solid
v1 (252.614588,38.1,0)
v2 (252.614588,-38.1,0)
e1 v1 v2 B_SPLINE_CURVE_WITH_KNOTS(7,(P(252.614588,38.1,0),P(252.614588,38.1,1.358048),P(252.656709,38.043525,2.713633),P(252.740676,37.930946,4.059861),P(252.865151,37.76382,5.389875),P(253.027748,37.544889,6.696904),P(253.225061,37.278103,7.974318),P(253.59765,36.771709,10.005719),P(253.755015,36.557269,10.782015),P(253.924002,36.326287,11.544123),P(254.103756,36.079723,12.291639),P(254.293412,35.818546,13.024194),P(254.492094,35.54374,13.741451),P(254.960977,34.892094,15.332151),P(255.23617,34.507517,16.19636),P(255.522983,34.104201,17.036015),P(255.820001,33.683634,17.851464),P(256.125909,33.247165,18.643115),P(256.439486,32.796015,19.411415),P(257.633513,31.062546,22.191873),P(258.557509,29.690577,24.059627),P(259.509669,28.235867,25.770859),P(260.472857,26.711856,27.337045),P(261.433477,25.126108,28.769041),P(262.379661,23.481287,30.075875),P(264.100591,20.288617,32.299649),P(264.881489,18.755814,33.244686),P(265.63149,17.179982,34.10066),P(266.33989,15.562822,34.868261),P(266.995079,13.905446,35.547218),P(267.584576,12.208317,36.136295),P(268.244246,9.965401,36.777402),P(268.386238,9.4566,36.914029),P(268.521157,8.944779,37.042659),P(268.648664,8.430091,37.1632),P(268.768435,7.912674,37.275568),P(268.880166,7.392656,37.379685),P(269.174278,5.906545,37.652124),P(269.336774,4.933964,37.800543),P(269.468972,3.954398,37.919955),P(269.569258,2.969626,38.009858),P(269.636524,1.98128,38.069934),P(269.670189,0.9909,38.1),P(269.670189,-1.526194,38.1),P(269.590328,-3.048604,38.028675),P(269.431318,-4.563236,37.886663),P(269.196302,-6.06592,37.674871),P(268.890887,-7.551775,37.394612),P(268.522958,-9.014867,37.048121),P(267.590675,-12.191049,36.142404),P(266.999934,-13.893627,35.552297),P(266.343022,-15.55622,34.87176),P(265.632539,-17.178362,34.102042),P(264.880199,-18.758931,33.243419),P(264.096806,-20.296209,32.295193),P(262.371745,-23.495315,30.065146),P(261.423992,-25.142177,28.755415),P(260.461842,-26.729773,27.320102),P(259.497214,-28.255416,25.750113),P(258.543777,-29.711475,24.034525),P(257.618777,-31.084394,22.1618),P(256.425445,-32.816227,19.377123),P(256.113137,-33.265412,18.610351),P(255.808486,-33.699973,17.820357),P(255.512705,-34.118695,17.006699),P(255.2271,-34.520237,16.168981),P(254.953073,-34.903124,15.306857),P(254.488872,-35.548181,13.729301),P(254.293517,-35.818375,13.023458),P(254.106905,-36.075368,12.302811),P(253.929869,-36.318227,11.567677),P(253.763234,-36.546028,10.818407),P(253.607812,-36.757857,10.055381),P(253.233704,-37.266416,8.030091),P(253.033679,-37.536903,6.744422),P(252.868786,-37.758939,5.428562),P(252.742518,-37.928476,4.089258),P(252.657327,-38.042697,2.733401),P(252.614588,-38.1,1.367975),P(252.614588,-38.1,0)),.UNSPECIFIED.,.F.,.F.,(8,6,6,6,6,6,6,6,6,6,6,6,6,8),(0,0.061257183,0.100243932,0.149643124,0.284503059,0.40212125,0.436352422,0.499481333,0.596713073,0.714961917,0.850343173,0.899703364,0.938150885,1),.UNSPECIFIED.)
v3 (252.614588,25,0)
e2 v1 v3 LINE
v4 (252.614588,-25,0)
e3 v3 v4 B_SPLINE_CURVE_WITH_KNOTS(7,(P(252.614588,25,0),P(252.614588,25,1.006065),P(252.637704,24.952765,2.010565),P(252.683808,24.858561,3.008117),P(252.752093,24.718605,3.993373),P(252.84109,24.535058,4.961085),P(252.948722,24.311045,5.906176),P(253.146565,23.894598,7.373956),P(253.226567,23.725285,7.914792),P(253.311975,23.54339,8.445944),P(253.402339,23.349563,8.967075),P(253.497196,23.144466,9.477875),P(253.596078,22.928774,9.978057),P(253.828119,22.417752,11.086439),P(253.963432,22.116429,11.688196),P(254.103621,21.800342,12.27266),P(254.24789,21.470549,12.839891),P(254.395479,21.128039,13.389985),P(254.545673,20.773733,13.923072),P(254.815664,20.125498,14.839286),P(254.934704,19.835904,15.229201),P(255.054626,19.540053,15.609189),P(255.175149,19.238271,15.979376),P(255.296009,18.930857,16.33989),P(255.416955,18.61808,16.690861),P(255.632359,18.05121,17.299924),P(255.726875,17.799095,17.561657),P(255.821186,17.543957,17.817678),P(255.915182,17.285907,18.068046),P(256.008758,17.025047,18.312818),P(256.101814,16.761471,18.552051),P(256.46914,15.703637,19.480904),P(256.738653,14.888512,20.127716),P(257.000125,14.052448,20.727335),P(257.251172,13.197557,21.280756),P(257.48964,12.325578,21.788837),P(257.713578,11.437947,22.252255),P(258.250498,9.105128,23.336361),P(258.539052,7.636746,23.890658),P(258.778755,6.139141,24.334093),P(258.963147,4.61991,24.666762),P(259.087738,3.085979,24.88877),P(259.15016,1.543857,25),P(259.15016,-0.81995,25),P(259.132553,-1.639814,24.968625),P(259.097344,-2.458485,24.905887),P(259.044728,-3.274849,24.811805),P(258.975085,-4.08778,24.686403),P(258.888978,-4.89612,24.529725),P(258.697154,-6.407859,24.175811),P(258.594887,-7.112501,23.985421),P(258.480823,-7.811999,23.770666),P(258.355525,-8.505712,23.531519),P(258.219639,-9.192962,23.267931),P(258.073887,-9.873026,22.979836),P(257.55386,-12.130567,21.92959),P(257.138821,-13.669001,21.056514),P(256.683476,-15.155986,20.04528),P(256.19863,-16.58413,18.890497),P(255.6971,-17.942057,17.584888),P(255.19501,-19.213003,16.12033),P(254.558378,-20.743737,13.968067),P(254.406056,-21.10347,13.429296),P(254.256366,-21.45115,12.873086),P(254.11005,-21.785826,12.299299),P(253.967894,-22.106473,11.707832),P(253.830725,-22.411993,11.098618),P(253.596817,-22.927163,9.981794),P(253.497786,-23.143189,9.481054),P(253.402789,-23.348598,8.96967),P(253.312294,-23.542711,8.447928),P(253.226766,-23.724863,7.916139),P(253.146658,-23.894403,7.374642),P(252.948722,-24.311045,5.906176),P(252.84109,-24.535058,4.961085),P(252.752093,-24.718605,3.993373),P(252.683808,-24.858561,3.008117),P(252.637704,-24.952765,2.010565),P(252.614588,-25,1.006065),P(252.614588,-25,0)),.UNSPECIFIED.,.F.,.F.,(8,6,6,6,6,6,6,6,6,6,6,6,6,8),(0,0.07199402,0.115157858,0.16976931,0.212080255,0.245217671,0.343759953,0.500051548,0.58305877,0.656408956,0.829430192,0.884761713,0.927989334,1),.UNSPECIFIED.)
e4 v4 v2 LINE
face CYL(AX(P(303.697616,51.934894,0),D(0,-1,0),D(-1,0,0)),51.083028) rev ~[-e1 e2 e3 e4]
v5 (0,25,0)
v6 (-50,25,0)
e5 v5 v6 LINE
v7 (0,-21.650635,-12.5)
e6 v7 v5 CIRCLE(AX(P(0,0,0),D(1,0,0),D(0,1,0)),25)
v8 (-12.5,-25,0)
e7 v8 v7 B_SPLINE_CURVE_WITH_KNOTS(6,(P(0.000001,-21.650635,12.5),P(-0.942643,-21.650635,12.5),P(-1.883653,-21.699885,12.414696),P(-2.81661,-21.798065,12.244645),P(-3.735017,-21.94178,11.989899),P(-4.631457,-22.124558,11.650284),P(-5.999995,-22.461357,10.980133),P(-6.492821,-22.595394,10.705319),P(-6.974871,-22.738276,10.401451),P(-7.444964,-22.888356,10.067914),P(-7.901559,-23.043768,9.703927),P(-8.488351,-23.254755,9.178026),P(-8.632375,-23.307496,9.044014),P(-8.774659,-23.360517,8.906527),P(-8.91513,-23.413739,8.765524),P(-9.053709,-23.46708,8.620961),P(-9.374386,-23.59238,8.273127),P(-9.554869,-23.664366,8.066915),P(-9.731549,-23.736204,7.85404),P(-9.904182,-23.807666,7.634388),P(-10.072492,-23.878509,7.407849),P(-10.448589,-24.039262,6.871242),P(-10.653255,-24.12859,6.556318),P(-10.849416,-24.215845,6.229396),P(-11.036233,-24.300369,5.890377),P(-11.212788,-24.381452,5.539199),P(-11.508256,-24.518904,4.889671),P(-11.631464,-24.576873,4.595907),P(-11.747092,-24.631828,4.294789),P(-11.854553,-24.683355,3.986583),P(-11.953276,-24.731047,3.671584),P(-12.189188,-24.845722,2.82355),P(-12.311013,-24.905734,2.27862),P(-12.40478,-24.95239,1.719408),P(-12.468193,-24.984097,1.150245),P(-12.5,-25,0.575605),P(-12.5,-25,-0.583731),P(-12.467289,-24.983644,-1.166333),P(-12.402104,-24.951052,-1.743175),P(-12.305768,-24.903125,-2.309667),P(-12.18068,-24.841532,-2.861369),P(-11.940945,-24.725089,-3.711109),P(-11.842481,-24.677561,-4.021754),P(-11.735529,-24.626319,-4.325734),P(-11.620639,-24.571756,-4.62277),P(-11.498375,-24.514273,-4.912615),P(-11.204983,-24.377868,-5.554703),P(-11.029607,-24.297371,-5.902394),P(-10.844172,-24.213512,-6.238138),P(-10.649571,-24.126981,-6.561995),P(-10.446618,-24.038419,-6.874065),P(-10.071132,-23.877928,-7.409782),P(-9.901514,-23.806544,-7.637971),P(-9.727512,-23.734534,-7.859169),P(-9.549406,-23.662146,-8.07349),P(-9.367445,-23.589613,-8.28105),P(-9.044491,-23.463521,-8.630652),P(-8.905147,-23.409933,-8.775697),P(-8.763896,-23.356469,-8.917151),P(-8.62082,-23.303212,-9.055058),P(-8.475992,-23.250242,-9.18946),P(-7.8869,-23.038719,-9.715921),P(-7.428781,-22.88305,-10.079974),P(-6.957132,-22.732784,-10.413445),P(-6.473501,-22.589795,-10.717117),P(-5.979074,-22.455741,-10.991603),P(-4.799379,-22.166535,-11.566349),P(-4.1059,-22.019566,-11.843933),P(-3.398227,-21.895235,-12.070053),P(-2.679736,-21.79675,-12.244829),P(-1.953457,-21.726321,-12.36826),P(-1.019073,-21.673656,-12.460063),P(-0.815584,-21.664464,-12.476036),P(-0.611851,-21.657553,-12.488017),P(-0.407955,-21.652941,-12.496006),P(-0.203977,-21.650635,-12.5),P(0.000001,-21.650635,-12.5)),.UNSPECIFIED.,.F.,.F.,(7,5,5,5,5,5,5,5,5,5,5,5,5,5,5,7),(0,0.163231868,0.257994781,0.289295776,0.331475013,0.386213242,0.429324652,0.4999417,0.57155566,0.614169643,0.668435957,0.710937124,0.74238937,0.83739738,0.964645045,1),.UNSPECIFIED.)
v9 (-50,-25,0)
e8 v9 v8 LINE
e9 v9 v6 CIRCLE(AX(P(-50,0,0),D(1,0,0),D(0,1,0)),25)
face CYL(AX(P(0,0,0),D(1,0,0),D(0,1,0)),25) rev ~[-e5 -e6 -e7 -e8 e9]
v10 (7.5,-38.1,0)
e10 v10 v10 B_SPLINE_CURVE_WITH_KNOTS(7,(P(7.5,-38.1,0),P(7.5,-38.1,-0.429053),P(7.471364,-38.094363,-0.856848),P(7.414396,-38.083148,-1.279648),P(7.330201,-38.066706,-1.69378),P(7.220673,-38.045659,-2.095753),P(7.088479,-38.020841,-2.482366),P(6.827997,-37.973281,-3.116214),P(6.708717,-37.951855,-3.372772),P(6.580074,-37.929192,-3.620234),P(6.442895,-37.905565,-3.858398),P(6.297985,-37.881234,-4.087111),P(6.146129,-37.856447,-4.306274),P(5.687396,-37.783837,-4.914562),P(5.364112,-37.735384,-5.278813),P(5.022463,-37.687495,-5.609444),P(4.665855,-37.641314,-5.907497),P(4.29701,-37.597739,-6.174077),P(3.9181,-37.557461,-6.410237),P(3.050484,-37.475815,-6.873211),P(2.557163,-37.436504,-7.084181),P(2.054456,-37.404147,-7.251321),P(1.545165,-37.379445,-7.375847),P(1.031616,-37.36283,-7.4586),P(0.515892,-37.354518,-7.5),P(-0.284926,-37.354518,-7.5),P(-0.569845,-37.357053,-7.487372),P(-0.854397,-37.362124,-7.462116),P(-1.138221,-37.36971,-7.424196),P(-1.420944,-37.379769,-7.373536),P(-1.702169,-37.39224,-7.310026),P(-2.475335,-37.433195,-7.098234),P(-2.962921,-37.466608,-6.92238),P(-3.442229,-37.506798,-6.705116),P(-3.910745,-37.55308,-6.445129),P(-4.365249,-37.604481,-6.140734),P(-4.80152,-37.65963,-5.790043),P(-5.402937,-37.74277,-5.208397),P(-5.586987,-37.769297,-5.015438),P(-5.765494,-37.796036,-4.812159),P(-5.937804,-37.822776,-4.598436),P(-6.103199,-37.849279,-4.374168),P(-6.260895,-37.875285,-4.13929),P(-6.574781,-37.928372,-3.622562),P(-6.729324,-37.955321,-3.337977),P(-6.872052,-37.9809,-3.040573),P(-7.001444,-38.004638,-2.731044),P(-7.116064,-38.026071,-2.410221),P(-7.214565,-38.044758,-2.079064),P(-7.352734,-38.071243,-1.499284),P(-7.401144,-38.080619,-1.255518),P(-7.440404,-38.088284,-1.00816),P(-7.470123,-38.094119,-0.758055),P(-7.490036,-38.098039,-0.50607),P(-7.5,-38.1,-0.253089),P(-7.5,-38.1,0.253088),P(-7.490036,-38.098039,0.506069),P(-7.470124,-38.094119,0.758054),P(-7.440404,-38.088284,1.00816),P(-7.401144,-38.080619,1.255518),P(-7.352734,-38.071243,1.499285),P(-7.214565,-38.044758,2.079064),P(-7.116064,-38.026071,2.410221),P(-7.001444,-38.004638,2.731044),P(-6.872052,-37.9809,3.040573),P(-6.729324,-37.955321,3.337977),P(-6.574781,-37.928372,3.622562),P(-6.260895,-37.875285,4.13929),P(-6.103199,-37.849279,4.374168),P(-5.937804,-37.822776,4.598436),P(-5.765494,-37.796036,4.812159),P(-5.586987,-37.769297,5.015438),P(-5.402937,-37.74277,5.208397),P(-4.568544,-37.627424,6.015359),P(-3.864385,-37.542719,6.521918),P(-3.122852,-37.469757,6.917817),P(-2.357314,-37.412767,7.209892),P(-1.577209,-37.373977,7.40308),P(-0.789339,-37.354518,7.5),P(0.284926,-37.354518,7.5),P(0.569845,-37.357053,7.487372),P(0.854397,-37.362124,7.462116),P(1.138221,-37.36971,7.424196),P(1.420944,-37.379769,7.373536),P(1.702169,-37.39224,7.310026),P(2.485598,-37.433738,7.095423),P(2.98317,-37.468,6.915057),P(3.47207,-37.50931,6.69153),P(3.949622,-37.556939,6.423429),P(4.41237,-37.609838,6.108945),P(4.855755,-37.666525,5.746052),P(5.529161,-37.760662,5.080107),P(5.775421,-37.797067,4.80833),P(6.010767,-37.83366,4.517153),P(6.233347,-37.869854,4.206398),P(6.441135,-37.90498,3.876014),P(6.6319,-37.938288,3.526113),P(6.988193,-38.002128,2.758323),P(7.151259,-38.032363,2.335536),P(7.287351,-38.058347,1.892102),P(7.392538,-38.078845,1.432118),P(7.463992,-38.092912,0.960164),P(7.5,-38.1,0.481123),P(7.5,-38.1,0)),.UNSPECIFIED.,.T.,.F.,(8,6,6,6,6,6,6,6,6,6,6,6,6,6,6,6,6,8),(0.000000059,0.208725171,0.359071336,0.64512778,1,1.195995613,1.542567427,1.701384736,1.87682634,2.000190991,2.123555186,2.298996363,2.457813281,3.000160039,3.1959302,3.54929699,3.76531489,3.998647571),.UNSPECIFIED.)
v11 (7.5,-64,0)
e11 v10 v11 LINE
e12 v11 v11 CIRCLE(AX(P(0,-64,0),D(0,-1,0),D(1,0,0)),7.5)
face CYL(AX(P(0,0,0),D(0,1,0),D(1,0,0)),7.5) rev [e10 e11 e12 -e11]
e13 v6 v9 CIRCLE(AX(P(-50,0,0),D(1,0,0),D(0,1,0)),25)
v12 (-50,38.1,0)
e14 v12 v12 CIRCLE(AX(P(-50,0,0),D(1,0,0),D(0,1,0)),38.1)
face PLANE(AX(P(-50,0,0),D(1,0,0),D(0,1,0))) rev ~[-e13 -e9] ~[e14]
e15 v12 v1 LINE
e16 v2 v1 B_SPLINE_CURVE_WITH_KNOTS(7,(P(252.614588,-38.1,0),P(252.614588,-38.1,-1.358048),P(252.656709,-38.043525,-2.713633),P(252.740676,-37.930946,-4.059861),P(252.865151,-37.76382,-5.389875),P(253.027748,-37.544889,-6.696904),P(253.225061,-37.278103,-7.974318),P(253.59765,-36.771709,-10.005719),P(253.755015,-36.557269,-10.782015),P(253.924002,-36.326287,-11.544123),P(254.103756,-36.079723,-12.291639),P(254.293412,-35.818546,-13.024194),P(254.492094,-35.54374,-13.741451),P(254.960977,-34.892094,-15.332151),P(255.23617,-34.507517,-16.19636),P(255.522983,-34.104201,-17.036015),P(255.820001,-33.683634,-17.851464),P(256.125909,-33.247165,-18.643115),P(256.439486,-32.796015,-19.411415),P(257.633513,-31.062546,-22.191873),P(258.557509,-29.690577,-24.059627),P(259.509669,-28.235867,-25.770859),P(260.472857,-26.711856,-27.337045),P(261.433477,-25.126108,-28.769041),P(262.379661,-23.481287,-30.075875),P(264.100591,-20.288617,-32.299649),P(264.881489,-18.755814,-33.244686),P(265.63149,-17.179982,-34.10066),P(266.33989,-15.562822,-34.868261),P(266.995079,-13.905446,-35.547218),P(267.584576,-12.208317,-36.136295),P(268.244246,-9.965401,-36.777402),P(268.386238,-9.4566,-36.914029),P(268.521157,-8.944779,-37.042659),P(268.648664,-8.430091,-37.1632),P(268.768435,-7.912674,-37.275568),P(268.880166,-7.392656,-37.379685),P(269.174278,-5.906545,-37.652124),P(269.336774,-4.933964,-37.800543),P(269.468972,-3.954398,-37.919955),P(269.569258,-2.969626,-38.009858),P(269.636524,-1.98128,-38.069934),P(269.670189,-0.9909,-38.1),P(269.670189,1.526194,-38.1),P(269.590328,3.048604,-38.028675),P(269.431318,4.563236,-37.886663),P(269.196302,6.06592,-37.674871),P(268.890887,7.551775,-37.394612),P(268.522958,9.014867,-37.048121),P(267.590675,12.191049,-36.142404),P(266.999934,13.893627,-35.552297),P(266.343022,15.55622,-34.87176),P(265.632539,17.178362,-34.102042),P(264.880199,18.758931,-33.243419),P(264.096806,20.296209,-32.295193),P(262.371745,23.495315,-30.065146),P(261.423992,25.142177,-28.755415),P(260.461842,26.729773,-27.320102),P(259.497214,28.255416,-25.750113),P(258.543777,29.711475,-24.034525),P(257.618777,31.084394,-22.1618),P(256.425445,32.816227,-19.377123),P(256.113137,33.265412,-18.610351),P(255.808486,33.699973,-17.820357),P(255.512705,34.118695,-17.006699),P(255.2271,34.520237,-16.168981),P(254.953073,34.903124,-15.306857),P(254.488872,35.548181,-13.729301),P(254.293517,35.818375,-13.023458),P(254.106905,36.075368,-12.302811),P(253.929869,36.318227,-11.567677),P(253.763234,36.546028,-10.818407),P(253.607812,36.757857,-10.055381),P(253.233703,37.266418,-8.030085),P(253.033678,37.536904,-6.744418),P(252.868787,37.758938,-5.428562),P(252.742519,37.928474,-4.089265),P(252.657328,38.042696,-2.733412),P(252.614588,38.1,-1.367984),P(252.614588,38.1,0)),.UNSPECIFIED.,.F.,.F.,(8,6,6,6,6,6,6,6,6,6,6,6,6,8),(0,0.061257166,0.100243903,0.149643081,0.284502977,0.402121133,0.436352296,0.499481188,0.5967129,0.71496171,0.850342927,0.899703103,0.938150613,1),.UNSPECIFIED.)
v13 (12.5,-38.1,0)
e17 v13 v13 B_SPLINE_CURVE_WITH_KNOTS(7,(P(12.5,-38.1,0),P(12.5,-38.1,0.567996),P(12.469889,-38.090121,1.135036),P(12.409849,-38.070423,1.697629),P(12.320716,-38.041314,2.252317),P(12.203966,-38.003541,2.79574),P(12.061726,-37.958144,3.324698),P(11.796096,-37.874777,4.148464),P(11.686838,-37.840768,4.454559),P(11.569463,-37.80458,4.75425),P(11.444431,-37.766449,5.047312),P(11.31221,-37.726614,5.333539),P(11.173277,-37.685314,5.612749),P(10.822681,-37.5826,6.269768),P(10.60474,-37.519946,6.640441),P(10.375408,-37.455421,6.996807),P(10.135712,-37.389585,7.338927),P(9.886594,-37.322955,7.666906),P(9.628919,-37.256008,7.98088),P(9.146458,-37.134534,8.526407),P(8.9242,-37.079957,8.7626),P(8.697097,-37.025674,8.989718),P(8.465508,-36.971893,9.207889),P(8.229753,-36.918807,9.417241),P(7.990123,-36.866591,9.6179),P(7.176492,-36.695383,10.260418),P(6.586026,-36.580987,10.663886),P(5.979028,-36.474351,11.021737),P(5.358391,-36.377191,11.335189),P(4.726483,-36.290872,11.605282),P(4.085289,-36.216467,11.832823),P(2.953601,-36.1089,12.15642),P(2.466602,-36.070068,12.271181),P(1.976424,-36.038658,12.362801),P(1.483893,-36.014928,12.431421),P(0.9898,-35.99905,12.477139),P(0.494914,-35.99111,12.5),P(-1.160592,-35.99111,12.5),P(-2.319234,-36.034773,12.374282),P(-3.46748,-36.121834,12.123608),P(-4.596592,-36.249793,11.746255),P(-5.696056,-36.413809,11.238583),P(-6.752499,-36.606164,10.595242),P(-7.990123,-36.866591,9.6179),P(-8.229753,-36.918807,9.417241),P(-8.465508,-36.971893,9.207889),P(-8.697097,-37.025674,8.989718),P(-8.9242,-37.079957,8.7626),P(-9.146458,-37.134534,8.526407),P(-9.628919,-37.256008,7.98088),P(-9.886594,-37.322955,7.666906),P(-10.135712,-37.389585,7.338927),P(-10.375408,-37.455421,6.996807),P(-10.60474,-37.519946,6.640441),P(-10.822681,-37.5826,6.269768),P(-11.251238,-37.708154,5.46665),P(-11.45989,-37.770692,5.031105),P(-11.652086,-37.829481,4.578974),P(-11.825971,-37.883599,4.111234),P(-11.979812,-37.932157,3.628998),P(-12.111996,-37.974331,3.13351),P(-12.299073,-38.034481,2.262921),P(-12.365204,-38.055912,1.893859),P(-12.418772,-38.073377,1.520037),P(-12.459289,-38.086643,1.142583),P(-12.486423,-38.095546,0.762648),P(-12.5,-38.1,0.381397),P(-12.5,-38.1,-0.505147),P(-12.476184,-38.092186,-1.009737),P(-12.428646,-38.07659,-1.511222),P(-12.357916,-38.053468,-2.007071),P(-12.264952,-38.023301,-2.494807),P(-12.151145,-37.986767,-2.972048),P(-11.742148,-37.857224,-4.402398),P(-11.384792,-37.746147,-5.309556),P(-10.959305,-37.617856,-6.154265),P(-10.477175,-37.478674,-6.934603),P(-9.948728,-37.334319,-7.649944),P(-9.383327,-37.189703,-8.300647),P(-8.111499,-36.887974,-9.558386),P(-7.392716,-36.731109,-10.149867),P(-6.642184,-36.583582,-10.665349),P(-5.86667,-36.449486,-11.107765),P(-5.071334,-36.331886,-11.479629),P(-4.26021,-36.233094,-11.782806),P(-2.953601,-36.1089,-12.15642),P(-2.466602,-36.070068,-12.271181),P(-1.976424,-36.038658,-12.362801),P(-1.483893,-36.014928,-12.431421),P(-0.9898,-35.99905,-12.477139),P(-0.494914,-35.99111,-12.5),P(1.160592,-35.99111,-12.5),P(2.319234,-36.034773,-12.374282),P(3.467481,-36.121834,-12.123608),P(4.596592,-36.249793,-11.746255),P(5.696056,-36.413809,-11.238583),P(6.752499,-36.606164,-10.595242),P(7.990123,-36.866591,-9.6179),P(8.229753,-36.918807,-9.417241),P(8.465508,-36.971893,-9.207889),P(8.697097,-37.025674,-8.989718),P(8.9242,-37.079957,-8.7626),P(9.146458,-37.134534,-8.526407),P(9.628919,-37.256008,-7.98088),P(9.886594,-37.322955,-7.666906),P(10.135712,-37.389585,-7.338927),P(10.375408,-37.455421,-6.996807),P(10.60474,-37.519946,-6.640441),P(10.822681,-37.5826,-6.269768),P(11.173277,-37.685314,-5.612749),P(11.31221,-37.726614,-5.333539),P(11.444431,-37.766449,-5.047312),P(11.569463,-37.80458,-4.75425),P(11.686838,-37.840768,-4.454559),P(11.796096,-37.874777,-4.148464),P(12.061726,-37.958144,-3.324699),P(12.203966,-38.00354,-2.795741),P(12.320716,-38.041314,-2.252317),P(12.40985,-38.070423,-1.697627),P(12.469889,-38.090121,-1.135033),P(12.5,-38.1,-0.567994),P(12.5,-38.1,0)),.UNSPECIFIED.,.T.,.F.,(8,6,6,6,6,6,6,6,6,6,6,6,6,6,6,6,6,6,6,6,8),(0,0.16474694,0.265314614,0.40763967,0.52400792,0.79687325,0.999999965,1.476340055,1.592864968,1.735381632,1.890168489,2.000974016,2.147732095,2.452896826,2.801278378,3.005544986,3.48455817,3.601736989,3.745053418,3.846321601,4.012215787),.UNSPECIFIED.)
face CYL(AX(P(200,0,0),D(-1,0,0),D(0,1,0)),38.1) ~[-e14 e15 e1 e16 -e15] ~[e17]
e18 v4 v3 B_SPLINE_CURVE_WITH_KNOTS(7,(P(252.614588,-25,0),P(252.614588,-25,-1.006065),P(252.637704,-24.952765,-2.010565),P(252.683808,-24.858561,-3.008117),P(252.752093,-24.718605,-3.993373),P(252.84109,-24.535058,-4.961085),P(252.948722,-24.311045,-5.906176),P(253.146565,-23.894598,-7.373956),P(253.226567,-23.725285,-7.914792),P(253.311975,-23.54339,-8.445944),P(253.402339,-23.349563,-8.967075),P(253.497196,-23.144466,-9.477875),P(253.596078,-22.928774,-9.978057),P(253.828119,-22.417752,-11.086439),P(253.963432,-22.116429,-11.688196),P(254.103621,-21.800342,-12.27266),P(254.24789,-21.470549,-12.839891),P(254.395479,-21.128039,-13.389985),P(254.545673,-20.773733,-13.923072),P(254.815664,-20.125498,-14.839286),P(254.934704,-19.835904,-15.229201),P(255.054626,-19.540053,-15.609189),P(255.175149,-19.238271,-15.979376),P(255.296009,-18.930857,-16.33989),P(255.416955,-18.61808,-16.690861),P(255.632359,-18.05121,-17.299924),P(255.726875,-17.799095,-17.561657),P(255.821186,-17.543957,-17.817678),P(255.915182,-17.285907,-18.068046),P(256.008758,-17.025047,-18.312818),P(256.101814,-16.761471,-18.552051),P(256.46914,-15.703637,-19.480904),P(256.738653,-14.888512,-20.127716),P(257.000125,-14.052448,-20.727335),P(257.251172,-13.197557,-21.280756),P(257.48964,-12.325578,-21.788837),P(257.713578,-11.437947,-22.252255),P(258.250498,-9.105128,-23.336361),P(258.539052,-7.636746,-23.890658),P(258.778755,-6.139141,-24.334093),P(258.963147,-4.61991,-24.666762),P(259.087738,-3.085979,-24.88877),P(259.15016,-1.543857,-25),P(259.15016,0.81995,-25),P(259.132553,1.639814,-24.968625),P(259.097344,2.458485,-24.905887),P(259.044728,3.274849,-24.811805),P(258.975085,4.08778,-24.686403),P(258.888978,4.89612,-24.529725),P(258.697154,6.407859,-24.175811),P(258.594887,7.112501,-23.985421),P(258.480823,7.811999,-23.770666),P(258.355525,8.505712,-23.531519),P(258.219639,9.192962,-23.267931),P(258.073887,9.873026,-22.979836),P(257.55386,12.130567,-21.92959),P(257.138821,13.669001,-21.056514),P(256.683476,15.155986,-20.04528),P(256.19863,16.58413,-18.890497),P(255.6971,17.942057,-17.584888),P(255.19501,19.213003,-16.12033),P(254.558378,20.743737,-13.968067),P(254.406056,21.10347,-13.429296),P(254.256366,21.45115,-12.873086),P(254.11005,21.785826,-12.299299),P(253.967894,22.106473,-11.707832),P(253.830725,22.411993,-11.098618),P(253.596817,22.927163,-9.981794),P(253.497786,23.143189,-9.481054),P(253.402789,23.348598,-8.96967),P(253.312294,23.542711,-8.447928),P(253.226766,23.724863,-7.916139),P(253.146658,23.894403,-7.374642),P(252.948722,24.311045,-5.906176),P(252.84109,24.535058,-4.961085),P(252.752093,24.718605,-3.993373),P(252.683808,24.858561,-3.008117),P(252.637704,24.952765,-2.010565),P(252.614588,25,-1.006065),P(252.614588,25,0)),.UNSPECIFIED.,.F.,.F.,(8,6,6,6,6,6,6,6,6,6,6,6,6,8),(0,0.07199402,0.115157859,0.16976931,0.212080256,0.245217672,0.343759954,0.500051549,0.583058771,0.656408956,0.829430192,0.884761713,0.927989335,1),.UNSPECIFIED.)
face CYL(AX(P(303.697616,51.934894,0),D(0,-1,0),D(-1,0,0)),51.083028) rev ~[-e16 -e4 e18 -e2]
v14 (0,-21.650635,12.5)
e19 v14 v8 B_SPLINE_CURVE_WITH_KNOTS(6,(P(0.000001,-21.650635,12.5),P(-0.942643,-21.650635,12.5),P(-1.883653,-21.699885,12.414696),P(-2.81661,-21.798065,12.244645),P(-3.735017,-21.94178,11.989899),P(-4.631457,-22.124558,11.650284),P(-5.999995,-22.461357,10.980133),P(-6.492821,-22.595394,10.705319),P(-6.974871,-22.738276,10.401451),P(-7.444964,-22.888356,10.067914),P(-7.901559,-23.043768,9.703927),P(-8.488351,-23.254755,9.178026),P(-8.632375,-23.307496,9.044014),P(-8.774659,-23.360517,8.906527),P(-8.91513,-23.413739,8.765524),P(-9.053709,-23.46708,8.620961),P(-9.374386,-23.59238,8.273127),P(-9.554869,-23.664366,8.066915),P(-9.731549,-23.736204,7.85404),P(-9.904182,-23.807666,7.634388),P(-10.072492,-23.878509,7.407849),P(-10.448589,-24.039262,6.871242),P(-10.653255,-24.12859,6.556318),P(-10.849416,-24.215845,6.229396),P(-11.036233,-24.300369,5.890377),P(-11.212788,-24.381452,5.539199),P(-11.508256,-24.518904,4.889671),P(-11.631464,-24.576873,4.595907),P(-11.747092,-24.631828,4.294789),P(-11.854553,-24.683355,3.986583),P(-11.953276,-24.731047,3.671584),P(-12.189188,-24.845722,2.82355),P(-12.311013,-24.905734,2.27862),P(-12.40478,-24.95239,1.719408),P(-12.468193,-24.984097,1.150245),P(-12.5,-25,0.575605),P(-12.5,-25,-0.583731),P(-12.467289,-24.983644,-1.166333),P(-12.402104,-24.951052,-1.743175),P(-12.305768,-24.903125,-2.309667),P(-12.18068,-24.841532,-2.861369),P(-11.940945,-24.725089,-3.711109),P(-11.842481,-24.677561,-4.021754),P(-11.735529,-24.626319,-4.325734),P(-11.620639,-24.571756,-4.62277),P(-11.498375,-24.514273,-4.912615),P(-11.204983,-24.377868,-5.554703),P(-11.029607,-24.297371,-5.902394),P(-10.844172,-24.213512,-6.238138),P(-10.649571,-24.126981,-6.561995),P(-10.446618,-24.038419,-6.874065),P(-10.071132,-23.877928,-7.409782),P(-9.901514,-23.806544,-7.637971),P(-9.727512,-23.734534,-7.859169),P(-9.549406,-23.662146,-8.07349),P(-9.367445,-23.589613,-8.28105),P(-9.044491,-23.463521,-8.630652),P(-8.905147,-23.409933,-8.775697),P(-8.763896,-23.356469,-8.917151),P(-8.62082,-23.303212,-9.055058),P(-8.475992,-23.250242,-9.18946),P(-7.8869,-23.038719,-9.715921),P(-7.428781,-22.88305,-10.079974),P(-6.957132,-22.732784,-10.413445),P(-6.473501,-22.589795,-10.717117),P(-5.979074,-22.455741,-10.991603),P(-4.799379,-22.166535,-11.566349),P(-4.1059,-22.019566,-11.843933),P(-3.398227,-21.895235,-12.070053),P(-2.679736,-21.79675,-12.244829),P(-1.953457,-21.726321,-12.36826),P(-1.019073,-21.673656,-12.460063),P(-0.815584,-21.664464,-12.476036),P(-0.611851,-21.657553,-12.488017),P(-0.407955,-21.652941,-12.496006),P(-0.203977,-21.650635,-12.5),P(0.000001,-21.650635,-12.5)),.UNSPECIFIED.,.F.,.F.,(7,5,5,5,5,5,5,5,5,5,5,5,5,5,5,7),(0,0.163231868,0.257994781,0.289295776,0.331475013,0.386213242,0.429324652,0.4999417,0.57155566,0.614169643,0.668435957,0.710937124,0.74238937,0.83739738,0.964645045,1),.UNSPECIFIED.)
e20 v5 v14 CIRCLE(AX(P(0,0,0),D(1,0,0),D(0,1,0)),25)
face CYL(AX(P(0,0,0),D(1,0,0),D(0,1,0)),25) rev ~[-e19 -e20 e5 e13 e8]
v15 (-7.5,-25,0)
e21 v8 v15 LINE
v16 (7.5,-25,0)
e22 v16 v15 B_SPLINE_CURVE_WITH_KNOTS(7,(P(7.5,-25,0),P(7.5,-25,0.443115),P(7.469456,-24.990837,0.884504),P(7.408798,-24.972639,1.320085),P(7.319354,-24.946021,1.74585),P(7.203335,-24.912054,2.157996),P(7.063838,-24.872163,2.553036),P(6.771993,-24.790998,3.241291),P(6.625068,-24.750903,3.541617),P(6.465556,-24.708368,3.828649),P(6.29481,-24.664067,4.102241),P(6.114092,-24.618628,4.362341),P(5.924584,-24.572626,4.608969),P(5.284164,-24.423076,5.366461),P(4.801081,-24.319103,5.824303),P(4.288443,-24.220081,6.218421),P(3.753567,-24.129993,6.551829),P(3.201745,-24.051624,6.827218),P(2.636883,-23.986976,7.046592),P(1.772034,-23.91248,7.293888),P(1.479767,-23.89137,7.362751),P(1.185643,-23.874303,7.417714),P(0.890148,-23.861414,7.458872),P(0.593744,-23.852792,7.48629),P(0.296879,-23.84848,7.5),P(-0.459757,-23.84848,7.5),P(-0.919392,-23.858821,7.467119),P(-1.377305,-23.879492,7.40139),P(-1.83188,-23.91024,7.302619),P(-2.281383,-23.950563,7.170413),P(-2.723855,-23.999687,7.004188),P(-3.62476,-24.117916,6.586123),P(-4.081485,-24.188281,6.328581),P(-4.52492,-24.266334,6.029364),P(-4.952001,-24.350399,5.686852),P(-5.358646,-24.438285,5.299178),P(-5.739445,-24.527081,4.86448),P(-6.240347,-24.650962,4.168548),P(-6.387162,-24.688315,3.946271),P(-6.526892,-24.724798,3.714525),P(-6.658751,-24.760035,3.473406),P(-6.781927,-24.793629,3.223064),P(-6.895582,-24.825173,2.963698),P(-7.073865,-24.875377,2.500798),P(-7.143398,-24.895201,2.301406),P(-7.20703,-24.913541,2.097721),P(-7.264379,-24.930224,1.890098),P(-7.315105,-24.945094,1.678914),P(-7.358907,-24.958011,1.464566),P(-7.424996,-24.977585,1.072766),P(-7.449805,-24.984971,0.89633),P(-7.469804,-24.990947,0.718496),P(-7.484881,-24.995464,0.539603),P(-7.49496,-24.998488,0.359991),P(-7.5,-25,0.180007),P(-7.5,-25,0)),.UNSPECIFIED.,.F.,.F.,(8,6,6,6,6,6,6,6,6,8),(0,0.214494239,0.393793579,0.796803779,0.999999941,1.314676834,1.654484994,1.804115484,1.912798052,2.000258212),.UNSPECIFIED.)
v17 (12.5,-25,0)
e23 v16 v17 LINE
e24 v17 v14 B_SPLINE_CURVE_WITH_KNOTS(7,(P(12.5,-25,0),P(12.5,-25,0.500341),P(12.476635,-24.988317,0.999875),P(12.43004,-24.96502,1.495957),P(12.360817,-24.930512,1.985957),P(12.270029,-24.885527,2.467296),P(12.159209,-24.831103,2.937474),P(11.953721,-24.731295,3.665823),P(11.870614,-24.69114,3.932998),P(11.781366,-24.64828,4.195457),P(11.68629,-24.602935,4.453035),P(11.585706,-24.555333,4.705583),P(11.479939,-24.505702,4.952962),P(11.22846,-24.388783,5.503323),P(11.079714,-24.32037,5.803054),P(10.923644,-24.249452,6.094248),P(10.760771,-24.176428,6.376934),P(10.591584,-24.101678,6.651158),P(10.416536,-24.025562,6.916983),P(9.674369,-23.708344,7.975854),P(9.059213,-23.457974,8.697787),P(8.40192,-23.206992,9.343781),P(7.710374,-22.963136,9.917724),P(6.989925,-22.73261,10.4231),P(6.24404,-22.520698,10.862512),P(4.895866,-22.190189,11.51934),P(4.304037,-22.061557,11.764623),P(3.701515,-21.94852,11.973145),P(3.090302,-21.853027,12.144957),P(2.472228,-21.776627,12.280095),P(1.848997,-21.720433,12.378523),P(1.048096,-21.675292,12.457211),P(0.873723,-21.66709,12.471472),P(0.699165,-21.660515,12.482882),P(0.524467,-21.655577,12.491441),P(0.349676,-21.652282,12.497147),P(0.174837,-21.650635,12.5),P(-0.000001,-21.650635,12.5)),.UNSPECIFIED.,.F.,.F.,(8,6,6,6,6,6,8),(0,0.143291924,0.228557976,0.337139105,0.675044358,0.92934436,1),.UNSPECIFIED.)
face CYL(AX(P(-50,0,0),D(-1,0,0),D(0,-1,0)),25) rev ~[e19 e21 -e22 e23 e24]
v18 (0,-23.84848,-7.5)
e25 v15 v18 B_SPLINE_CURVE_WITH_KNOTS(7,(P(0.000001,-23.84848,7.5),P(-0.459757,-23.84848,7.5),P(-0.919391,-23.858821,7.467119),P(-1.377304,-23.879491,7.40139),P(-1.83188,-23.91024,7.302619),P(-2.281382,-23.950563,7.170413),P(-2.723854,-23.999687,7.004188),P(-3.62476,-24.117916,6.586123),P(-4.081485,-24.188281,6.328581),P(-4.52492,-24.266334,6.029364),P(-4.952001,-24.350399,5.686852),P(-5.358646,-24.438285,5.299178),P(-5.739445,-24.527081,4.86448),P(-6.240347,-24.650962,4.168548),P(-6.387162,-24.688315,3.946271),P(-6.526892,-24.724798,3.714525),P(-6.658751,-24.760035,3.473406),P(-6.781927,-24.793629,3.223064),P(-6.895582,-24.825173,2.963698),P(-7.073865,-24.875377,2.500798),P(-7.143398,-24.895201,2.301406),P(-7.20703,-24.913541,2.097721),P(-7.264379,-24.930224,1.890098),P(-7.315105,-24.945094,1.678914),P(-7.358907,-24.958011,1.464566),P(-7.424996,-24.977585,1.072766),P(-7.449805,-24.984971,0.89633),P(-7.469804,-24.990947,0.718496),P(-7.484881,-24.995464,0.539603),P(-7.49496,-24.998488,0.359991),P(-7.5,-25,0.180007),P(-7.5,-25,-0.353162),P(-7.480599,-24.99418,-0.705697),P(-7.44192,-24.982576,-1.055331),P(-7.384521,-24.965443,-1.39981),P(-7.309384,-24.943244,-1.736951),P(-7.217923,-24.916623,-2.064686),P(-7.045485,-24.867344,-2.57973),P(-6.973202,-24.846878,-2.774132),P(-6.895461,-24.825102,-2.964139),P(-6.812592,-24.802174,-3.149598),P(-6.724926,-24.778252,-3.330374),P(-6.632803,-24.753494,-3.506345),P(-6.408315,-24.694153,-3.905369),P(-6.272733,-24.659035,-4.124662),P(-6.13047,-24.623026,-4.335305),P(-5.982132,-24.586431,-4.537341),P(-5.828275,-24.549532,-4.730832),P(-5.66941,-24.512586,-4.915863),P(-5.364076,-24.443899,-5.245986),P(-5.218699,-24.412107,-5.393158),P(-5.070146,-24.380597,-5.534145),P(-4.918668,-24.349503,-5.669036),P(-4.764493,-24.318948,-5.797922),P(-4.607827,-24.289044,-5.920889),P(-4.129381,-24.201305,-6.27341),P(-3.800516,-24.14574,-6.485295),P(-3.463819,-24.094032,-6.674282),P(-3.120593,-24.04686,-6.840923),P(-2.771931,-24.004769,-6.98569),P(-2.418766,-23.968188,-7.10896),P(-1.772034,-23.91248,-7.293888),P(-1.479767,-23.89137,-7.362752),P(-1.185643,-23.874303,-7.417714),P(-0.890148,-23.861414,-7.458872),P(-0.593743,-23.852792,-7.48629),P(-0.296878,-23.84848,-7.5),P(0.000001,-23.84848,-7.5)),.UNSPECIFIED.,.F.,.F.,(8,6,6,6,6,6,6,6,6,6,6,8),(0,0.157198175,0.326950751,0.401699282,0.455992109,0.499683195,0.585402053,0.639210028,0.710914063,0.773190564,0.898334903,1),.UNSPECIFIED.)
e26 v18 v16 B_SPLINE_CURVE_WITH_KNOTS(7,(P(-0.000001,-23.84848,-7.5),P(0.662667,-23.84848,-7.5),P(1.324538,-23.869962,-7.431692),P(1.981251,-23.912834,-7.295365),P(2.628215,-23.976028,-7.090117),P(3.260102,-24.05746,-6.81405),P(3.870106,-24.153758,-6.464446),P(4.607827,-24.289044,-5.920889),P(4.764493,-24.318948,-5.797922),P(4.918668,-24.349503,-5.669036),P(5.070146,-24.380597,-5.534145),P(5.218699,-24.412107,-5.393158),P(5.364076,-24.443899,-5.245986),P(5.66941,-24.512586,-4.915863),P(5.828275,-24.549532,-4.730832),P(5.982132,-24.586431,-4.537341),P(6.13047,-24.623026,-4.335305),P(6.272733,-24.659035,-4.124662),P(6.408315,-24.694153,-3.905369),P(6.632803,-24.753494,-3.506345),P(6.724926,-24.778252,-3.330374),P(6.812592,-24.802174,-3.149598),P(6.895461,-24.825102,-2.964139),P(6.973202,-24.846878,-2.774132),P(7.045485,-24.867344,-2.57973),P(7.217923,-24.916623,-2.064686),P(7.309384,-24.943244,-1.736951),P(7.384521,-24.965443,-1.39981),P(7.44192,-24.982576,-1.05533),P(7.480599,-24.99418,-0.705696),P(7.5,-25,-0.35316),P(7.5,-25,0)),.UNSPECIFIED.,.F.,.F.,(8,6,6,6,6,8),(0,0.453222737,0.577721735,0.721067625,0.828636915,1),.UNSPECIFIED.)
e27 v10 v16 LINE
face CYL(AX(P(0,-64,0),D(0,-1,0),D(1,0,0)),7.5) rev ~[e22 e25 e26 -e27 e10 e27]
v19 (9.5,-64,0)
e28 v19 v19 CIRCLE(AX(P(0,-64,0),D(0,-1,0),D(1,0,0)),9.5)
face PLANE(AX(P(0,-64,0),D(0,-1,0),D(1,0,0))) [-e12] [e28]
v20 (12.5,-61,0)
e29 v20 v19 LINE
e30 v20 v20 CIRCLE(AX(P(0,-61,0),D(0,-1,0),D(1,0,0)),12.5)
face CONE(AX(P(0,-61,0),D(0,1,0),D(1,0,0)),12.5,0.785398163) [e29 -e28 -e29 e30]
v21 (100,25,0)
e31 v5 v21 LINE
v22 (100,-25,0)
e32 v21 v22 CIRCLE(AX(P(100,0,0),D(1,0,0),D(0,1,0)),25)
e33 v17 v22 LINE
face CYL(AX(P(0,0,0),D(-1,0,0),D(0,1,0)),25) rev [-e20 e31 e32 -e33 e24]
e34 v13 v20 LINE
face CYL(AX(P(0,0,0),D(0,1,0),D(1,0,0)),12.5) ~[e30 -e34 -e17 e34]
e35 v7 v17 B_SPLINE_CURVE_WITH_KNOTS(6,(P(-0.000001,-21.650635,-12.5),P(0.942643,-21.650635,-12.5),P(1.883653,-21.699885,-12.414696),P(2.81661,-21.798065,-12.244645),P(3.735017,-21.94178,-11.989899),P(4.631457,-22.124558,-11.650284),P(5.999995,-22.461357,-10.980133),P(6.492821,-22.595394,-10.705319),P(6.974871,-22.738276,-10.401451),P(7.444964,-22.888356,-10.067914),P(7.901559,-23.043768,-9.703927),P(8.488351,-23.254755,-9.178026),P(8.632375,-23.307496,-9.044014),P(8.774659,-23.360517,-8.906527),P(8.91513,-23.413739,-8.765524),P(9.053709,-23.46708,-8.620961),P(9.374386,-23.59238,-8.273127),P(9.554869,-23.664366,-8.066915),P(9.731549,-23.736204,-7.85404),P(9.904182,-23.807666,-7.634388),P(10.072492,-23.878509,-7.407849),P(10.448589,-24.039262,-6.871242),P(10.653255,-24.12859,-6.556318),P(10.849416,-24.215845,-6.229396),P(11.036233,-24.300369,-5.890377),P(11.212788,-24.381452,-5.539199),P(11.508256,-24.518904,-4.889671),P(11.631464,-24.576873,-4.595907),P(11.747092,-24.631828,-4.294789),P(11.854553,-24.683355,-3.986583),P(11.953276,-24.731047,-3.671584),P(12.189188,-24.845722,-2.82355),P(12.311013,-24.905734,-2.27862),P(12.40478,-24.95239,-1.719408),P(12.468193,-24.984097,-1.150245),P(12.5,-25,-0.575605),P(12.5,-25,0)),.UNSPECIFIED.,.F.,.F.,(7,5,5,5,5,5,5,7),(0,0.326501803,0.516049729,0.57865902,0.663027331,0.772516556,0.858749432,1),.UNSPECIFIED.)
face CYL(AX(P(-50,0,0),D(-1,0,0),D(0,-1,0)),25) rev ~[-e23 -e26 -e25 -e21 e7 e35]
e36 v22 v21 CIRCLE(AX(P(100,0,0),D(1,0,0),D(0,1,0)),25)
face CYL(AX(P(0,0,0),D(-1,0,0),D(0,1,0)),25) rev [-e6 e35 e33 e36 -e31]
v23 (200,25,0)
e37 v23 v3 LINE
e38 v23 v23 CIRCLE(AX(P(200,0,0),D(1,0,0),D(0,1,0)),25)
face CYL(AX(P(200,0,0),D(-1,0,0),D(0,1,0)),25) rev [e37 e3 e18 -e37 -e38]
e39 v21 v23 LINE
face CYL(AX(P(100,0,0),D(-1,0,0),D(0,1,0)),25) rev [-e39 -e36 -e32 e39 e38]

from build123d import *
from build123d import SkipClean  # not in build123d's __all__

# Parameters (mm, degrees)
F0_R      = 12.5
F0_R_2    = 7.5
F1_DEPTH  = 64
F2_R      = 38.1
F2_R_2    = 25
F3_DEPTH  = 100
F4_DEPTH  = 50
F5_SIZE   = 3
F6_R      = 25
F7_DEPTH  = 200
F8_R      = 7.5
F9_DEPTH  = 50
F10_DEPTH = 100
F11_R     = 7.5
F12_DEPTH = 50
F13_DEPTH = 75


with BuildPart() as f1:
    # F0 (on Front) → F1 (new body)
    with BuildSketch(Plane.XZ):
        Circle(F0_R)
        Circle(F0_R_2, mode=Mode.SUBTRACT)
    extrude(amount=F1_DEPTH)

    # F2 (on Right) → F3 (join)
    with BuildSketch(Plane.YZ):
        Circle(F2_R)
        Circle(F2_R_2, mode=Mode.SUBTRACT)
    extrude(amount=F3_DEPTH)

    # F2 (on Right) → F4 (join)
    with BuildSketch(Plane.YZ):
        Circle(F2_R)
        Circle(F2_R_2, mode=Mode.SUBTRACT)
    extrude(amount=-F4_DEPTH)

    # F5
    f5_edges = [f1.edges().sort_by_distance(p)[0] for p in [
        (-12.5, -64, 0),
    ]]
    chamfer(f5_edges, length=F5_SIZE)

    # F6 (on face) → F7 (cut)
    with BuildSketch(Plane(origin=(-50, 0, 0), x_dir=(0, -1, 0), z_dir=(-1, 0, 0))):
        Circle(F6_R)
    extrude(amount=-F7_DEPTH, mode=Mode.SUBTRACT)

    # F8 (on face) → F9 (cut)
    with BuildSketch(Plane.XZ.offset(64)):
        Circle(F8_R)
    extrude(amount=-F9_DEPTH, mode=Mode.SUBTRACT)

    # F10 (add): a face of the model
    f10_faces = [f1.faces().sort_by_distance(p)[0] for p in [
        (100, -37.0223692655, 0),
    ]]
    with SkipClean():  # cleaning this boolean's faces spoils the solid; the shape is the same uncleaned
        extrude(f10_faces, amount=F10_DEPTH)

    # F11 (on face) → F12 (cut)
    with BuildSketch(Plane.XZ.offset(64)):
        Circle(F11_R)
    with SkipClean():  # cleaning this boolean's faces spoils the solid; the shape is the same uncleaned
        extrude(amount=-F12_DEPTH, mode=Mode.SUBTRACT)

    # F13 (add): a face of the model
    f13_faces = [f1.faces().sort_by_distance(p)[0] for p in [
        (200, -37.0223692655, 0),
    ]]
    extrude(f13_faces, amount=F13_DEPTH)

    # F14 (on Top) → F15 (revolve, cut)
    with BuildSketch(Plane.XY):
        Polygon((280.1408666709, 52.4849742776), (252.6145875454, 51.9348941743), (252.6145875454, -50.6588555872), (280.1408666709, -51.4342445287), align=None)
    with SkipClean():  # cleaning this boolean's faces spoils the solid; the shape is the same uncleaned
        revolve(axis=Axis((303.6976158619, 0.4289562068, 0), (0, -1, 0)), mode=Mode.SUBTRACT)


solid = f1.part
